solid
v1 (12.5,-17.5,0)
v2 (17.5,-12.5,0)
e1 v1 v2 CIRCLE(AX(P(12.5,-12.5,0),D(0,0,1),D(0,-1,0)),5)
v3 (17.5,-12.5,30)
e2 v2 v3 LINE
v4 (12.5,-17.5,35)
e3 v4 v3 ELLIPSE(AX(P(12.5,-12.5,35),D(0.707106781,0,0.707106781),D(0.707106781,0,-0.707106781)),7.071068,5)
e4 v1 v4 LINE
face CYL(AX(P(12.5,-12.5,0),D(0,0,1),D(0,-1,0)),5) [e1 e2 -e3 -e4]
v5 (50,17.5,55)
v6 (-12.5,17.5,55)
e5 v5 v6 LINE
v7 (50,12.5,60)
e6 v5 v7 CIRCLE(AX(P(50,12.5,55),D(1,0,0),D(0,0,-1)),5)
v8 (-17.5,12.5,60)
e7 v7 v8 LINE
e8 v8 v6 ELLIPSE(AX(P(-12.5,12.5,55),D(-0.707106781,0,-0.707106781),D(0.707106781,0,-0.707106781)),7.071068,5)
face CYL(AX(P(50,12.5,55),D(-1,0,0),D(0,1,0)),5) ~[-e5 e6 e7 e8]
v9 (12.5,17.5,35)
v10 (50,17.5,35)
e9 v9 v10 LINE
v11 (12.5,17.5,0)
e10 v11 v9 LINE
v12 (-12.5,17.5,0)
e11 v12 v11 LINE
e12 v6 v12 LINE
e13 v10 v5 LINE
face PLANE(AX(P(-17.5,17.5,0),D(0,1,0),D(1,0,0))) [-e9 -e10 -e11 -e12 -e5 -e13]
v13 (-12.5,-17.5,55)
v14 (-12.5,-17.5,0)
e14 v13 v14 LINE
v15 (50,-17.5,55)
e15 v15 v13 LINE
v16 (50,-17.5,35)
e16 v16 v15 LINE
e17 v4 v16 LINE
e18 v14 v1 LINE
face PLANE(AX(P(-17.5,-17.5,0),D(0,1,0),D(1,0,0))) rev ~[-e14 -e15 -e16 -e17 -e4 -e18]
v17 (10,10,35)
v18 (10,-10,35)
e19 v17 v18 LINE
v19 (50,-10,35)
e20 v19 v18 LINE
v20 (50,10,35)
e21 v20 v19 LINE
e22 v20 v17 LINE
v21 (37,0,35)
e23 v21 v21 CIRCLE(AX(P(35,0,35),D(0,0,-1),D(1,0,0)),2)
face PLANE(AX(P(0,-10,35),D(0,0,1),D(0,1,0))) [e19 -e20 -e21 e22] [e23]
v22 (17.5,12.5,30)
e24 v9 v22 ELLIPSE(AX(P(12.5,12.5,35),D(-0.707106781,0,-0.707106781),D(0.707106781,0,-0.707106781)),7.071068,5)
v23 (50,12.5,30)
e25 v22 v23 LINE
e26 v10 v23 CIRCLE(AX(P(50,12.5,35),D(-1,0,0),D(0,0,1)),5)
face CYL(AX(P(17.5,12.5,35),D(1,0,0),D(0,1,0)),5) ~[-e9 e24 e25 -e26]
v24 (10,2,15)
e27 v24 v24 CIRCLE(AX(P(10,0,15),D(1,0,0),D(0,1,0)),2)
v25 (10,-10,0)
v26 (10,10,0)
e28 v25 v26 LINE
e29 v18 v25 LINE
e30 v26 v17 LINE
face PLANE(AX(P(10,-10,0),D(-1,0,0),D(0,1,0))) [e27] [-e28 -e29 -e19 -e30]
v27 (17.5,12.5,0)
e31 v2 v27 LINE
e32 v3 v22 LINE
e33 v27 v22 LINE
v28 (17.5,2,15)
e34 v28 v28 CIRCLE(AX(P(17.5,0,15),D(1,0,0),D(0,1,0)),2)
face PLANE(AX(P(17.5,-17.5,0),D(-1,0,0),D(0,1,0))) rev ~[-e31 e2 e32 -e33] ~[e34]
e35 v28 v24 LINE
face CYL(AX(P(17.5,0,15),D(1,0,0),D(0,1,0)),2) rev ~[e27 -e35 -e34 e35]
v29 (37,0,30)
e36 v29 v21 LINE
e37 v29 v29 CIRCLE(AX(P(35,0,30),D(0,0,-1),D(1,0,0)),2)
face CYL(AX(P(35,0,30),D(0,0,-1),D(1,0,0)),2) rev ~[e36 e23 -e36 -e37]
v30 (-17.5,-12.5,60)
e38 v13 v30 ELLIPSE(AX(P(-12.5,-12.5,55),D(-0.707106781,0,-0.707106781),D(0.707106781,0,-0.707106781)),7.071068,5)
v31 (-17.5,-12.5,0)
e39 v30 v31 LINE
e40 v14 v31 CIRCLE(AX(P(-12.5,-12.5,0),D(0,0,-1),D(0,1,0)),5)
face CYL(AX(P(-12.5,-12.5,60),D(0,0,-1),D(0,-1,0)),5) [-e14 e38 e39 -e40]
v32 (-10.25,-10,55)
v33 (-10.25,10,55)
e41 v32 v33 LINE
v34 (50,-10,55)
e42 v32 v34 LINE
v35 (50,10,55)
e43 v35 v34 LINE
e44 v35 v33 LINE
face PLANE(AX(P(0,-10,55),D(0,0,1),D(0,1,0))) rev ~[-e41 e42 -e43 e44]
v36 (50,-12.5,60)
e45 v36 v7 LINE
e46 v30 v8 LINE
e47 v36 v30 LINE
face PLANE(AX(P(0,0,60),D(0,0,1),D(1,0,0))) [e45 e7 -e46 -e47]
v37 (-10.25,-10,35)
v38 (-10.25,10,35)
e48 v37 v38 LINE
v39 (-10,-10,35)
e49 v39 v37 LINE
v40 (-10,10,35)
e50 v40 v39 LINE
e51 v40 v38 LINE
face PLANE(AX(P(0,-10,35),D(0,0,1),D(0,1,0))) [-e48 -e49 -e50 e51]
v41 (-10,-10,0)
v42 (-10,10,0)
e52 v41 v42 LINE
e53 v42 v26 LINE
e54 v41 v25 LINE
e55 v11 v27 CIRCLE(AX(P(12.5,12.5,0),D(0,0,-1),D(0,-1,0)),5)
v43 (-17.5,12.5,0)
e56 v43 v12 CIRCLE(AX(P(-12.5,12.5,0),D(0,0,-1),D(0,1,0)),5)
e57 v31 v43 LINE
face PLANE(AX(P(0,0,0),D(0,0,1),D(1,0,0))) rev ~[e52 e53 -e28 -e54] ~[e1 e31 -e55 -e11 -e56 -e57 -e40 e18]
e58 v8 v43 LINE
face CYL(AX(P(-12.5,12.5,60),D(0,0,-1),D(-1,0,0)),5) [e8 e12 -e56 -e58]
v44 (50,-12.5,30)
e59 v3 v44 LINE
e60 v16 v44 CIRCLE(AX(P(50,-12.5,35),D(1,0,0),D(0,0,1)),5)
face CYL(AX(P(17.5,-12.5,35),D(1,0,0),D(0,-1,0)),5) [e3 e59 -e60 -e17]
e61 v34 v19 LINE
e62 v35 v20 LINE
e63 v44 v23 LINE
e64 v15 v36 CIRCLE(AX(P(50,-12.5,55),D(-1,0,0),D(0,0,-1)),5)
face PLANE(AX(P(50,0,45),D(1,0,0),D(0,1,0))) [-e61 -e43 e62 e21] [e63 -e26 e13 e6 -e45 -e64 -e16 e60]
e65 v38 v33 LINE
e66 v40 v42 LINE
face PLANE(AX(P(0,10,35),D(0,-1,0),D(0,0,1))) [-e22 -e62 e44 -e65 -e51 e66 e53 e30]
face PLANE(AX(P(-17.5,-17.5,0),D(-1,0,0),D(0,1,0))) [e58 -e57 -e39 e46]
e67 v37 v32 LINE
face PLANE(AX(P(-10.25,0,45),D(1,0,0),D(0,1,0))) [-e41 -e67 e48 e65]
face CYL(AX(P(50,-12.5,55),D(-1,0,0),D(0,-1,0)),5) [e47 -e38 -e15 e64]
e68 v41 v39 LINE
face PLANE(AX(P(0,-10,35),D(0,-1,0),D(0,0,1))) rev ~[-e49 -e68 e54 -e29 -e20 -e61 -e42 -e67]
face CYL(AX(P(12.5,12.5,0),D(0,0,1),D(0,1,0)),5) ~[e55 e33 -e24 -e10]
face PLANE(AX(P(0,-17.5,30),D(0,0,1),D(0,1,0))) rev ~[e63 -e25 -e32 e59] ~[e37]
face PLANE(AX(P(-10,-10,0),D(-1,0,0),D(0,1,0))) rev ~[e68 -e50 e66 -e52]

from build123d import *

# Parameters (mm, degrees)
F0_W      = 35
F0_H      = 35
F0_W_2    = 20
F0_H_2    = 20
F1_DEPTH  = 60
F3_R      = 2
F4_DEPTH  = 10
F6_W      = 35
F6_H      = 30
F6_W_2    = 20
F6_H_2    = 20
F7_DEPTH  = 50
F8_DEPTH  = 17.5
F9_DEPTH  = 60
F10_DEPTH = 10.25
F11_DEPTH = 55
F12_R     = 5
F13_R     = 2
F14_DEPTH = 20


# Not quite as in the source:
# - a feature of the source that left no trace in its solid (it failed there, or was rolled back) is left out


with BuildPart() as f1:
    # F0 (on Top) → F1 (new body)
    with BuildSketch(Plane.XY):
        Rectangle(F0_W, F0_H)
        Rectangle(F0_W_2, F0_H_2, mode=Mode.SUBTRACT)
    extrude(amount=F1_DEPTH)

    # F3 (on face) → F4 (cut)
    with BuildSketch(Plane.YZ.offset(17.5)):
        with Locations((0, 40)):
            Circle(F3_R)
        with Locations((0, 15)):
            Circle(F3_R)
    extrude(amount=-F4_DEPTH, mode=Mode.SUBTRACT)

    # F6 (on Right) → F7 (join)
    with BuildSketch(Plane.YZ):
        with Locations((0, 45)):
            Rectangle(F6_W, F6_H)
        with Locations((0, 45)):
            Rectangle(F6_W_2, F6_H_2, mode=Mode.SUBTRACT)
        with Locations((0, 45)):
            Rectangle(F6_W_2, F6_H_2)
    extrude(amount=F7_DEPTH)

    # F6 (on Right) → F8 (join, through all)
    with BuildSketch(Plane.YZ):
        with Locations((0, 45)):
            Rectangle(F6_W, F6_H)
        with Locations((0, 45)):
            Rectangle(F6_W_2, F6_H_2, mode=Mode.SUBTRACT)
        with Locations((0, 45)):
            Rectangle(F6_W_2, F6_H_2)
    extrude(amount=-F8_DEPTH)

    # F6 (on Right) → F9 (cut)
    with BuildSketch(Plane.YZ):
        with Locations((0, 45)):
            Rectangle(F6_W_2, F6_H_2)
    extrude(amount=F9_DEPTH, mode=Mode.SUBTRACT)

    # F6 (on Right) → F10 (cut)
    with BuildSketch(Plane.YZ):
        with Locations((0, 45)):
            Rectangle(F6_W_2, F6_H_2)
    extrude(amount=-F10_DEPTH, mode=Mode.SUBTRACT)

    # F0 (on Top) → F11 (cut, through all)
    with BuildSketch(Plane.XY):
        Rectangle(F0_W_2, F0_H_2)
    extrude(amount=F11_DEPTH, mode=Mode.SUBTRACT)

    # F12
    f12_edges = [f1.edges().sort_by_distance(p)[0] for p in [
        (-17.5, -17.5, 30),
        (-17.5, 17.5, 30),
        (33.75, -17.5, 30),
        (33.75, 17.5, 30),
        (16.25, 17.5, 60),
        (16.25, -17.5, 60),
        (17.5, -17.5, 15),
        (17.5, 17.5, 15),
    ]]
    fillet(f12_edges, radius=F12_R)

    # F13 (on face) → F14 (cut)
    with BuildSketch(Plane(origin=(0, 0, 30), x_dir=(1, 0, 0), z_dir=(0, 0, -1))):
        with Locations((35, 0)):
            Circle(F13_R)
    extrude(amount=-F14_DEPTH, mode=Mode.SUBTRACT)


solid = f1.part
